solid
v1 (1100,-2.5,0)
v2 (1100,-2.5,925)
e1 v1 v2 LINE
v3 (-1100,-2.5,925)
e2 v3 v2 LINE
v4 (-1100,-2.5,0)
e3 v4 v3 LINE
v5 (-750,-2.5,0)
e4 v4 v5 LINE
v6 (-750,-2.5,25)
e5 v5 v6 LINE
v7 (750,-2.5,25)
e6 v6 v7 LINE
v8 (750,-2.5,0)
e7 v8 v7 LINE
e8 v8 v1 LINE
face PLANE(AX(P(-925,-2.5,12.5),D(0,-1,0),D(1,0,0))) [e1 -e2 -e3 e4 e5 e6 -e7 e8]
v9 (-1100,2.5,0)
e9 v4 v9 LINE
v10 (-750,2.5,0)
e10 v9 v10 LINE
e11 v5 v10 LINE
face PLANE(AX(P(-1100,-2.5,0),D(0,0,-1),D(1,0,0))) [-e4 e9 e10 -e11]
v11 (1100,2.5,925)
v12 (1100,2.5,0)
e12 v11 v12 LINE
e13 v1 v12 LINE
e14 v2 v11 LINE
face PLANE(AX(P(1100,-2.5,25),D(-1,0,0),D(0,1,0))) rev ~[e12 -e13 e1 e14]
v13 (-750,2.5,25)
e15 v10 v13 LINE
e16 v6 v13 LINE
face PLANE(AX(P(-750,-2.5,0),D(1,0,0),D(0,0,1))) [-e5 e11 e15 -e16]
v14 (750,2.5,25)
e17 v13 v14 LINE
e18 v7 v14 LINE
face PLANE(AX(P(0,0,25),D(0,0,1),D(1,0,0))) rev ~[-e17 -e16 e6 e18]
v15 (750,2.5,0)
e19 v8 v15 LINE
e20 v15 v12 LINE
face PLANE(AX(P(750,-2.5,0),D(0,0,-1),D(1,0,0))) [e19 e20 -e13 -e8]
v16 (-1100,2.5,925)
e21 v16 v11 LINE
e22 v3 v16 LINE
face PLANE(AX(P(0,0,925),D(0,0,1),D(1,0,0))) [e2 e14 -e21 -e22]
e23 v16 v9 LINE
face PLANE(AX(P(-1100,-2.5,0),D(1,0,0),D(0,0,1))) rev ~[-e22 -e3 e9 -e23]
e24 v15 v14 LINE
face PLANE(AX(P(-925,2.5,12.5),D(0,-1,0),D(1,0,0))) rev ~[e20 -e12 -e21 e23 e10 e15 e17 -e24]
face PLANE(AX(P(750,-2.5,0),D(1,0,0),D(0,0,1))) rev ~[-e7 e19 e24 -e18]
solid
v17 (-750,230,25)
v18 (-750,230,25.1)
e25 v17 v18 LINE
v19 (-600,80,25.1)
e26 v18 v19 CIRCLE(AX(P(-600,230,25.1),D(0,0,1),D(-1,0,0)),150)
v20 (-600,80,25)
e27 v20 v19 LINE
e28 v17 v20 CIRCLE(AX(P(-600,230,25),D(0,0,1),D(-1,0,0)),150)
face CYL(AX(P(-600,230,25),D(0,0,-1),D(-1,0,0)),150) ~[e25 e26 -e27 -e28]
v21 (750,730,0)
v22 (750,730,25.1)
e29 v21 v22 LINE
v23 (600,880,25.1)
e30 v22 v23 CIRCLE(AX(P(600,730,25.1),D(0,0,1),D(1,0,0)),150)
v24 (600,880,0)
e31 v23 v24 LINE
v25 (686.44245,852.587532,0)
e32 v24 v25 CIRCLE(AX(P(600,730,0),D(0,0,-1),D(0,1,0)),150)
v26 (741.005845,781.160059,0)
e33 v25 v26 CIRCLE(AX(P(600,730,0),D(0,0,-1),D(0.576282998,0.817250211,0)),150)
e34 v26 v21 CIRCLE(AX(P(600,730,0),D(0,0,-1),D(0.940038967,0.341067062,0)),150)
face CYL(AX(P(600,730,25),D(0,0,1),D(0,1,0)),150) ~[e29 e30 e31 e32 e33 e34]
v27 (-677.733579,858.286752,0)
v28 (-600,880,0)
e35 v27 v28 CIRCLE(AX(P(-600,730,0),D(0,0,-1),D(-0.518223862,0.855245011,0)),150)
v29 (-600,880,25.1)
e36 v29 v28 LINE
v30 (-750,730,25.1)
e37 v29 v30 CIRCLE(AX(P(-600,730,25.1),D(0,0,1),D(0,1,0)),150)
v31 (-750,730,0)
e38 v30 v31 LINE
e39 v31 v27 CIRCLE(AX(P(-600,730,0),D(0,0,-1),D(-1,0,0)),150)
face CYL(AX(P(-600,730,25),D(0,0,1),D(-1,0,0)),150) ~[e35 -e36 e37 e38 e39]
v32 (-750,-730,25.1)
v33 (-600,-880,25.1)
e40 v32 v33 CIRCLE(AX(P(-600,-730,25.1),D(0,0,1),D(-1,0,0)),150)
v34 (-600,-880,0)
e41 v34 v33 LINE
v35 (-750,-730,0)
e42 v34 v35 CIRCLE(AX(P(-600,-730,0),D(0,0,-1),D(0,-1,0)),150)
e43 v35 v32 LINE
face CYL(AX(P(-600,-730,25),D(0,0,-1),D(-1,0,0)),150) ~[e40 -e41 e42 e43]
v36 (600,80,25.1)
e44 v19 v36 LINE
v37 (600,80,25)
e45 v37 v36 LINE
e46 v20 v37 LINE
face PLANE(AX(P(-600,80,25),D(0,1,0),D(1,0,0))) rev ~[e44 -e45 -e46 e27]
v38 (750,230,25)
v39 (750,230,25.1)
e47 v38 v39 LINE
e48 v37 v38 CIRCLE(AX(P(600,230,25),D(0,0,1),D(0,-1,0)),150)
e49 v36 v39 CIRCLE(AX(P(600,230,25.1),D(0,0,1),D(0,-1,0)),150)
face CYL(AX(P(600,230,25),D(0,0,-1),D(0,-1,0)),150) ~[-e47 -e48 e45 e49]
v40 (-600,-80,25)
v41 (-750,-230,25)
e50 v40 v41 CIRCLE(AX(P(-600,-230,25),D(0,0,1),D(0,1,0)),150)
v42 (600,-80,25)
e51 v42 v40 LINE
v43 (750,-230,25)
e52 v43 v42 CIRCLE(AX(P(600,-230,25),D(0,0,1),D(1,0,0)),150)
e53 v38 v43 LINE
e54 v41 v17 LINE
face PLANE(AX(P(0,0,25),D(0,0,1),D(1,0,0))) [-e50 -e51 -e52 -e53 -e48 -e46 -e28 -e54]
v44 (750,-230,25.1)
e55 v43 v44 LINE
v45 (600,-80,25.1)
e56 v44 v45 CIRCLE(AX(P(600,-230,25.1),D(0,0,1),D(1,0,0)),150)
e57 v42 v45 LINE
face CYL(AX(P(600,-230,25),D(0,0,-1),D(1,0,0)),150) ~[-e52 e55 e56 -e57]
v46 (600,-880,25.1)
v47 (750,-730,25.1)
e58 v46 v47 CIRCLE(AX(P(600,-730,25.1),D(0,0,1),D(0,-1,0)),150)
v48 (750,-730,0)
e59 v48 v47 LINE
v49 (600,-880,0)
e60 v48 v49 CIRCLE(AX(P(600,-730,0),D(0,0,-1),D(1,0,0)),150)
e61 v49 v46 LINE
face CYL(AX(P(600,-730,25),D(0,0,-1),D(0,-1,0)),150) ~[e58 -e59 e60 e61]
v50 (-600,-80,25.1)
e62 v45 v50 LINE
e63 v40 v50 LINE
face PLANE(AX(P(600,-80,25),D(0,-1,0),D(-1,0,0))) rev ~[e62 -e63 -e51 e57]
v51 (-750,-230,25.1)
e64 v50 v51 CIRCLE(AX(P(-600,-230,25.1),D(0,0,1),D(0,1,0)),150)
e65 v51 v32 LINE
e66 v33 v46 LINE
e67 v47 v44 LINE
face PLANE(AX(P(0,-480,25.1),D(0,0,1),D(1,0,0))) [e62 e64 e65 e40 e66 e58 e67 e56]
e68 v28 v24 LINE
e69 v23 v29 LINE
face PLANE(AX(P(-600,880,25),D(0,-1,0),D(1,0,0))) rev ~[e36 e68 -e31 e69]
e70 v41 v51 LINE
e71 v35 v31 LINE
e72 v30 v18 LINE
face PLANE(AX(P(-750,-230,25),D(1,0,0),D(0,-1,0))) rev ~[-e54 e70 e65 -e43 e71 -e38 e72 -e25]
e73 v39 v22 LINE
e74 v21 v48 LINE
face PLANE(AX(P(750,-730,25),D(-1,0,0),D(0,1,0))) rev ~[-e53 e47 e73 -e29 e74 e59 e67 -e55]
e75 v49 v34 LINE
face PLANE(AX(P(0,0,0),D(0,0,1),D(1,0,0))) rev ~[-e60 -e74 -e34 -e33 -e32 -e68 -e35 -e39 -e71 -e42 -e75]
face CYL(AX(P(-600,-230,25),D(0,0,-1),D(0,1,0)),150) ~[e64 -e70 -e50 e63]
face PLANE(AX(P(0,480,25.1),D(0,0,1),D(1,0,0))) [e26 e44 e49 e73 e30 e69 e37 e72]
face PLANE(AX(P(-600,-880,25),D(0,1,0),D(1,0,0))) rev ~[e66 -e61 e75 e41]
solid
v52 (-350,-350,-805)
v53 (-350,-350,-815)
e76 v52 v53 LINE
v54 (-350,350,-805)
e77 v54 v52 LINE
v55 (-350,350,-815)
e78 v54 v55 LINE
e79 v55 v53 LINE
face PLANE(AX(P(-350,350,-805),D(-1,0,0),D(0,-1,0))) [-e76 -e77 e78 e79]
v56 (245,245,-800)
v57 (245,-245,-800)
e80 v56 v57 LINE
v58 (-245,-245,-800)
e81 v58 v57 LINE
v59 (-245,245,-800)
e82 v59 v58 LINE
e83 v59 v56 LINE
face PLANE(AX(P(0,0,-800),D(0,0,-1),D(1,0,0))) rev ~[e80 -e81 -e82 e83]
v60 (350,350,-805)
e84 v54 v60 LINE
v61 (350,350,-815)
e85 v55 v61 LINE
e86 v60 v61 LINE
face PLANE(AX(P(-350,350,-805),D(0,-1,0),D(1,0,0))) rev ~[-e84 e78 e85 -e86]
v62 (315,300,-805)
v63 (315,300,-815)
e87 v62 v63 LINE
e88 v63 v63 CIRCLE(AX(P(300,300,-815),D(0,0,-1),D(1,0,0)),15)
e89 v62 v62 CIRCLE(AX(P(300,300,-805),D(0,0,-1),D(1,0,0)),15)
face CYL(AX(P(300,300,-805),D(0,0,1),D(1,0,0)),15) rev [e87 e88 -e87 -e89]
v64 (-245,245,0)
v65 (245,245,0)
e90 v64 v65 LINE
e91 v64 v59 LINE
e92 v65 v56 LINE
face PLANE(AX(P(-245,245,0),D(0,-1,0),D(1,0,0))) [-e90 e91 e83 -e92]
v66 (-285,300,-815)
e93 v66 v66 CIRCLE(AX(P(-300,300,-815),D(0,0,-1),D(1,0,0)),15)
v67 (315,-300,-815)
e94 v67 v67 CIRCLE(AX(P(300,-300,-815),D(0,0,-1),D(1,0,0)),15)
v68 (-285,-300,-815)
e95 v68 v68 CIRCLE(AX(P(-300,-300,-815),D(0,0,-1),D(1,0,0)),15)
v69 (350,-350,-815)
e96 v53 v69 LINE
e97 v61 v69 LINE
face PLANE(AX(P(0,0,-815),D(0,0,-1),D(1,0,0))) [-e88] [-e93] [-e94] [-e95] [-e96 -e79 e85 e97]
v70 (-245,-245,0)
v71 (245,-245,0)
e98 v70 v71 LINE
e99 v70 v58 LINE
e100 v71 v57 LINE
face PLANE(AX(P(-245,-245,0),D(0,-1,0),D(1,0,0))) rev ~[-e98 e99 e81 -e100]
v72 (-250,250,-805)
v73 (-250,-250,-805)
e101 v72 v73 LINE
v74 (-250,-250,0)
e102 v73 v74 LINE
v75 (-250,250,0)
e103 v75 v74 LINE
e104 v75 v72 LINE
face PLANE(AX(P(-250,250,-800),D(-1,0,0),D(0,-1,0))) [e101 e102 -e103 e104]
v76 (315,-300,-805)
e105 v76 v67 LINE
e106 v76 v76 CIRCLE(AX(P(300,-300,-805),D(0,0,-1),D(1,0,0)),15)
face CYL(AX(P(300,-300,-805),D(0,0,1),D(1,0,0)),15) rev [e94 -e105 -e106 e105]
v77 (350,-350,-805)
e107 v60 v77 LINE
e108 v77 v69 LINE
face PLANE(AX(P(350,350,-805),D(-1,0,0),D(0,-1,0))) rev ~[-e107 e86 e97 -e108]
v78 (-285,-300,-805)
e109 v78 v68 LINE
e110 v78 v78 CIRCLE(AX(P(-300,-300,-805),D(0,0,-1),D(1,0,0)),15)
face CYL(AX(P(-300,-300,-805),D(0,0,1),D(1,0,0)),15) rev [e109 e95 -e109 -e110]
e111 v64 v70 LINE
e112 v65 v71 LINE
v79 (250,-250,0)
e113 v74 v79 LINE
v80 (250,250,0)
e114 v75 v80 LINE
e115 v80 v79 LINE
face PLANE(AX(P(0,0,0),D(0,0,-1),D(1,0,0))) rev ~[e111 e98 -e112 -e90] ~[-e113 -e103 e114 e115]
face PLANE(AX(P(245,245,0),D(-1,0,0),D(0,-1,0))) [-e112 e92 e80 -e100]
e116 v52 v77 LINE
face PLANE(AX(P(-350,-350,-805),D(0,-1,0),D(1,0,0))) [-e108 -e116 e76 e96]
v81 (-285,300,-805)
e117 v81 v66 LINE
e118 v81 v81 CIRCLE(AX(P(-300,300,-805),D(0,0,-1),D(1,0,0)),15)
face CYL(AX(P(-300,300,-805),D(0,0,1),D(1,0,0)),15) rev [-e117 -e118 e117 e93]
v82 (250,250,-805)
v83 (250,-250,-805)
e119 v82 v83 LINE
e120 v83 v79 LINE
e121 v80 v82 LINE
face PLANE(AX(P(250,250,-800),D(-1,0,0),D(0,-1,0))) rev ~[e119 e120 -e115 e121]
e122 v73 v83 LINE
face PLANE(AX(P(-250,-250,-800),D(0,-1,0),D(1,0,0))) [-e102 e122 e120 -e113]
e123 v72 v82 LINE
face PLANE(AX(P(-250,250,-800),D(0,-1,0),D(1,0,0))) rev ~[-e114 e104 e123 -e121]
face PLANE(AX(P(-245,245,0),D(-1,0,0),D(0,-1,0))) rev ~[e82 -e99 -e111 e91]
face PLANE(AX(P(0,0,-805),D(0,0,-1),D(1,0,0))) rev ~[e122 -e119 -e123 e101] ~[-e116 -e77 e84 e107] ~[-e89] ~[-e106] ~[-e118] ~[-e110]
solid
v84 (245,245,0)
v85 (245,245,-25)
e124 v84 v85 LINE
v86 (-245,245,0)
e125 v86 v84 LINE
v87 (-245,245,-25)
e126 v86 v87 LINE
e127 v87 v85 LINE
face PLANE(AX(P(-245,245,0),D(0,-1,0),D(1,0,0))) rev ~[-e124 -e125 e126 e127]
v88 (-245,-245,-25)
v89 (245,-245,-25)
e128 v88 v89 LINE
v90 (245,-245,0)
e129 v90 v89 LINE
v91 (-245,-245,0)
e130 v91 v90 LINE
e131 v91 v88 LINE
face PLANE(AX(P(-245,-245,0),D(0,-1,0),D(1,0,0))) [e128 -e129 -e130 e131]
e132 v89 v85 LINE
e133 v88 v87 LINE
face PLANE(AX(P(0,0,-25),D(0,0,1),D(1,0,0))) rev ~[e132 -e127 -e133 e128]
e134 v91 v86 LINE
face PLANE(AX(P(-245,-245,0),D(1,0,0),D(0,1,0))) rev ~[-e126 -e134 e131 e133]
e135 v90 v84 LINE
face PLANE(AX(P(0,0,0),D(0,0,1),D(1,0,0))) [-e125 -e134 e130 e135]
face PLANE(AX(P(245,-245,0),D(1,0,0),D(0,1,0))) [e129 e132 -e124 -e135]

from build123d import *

# Parameters (mm, degrees)
F0_R      = 1250
F1_DEPTH  = 25
F3_DEPTH  = 0.1
F4_W      = 500
F4_H      = 500
F4_W_2    = 490
F4_H_2    = 490
F5_DEPTH  = 800
F6_W      = 2200
F6_H      = 5
F7_DEPTH  = 900
F8_W      = 500
F8_H      = 500
F9_DEPTH  = 5
F10_W     = 700
F10_H     = 700
F10_R     = 15
F11_DEPTH = 10
F13_DEPTH = 30
F15_DEPTH = 30
F16_W     = 490
F16_H     = 490
F17_DEPTH = 25
F18_R     = 350
F20_DEPTH = 25
F21_W     = 350
F21_H     = 25
F22_DEPTH = 5


# Not quite as in the source:
# - a feature names something its author has since deleted; it is built from what else it names


with BuildPart() as f1:
    # F0 (on Top) → F1 (new body)
    with BuildSketch(Plane.XY):
        Circle(F0_R)
    extrude(amount=F1_DEPTH)

    # F2 (on face) → F3 (join)
    with BuildSketch(Plane.XY.offset(25)):
        with BuildLine():
            Line((-600, 80), (600, 80))
            ThreePointArc((600, 80), (706.066017178, 123.933982822), (750, 230))
            Line((750, 230), (750, 730))
            ThreePointArc((750, 730), (706.066017178, 836.066017178), (600, 880))
            Line((600, 880), (-600, 880))
            ThreePointArc((-600, 880), (-706.066017178, 836.066017178), (-750, 730))
            Line((-750, 730), (-750, 230))
            ThreePointArc((-750, 230), (-706.066017178, 123.933982822), (-600, 80))
        make_face()
        with BuildLine():
            ThreePointArc((-600, -80), (-706.066017178, -123.933982822), (-750, -230))
            Line((-750, -230), (-750, -730))
            ThreePointArc((-750, -730), (-706.066017178, -836.066017178), (-600, -880))
            Line((-600, -880), (600, -880))
            ThreePointArc((600, -880), (706.066017178, -836.066017178), (750, -730))
            Line((750, -730), (750, -230))
            ThreePointArc((750, -230), (706.066017178, -123.933982822), (600, -80))
            Line((600, -80), (-600, -80))
        make_face()
    extrude(amount=F3_DEPTH)

    # F12 (on face) → F13 (cut)
    with BuildSketch(Plane.XY.offset(25)):
        with BuildLine():
            ThreePointArc((835.2245207129, -930), (0, -1250), (-835.2245207129, -930))
            Line((-835.2245207129, -930), (-1254.9974999975, -930))
            Line((-1254.9974999975, -930), (-1254.9974999975, -1430))
            Line((-1254.9974999975, -1430), (1245.0025000025, -1430))
            Line((1245.0025000025, -1430), (1245.0025000025, -930))
            Line((1245.0025000025, -930), (835.2245207129, -930))
        make_face()
        with BuildLine():
            Line((-835.2245207129, 930), (835.2245207129, 930))
            ThreePointArc((835.2245207129, 930), (0, 1250), (-835.2245207129, 930))
        make_face()
        with BuildLine():
            Line((835.2245207129, -930), (-835.2245207129, -930))
            ThreePointArc((-835.2245207129, -930), (0, -1250), (835.2245207129, -930))
        make_face()
    extrude(amount=-F13_DEPTH, mode=Mode.SUBTRACT)

    # F14 (on face) → F15 (cut)
    with BuildSketch(Plane.XY.offset(25)):
        Polygon((835.2245207128, 930), (835.2245207128, -930), (1324.2889336484, -826), (1324.2889336484, 930), align=None)
        Polygon((-1324.2889336484, -826), (-835.2245207128, -930), (-835.2245207128, 930), (-1324.2889336484, 930), align=None)
    extrude(amount=-F15_DEPTH, mode=Mode.SUBTRACT)

    # F18
    f18_edges = [f1.edges().sort_by_distance(p)[0] for p in [
        (-835.224521, 930, 12.5),
        (-835.224521, -930, 12.5),
        (835.224521, -930, 12.5),
        (835.224521, 930, 12.5),
    ]]
    fillet(f18_edges, radius=F18_R)

    # F19 (on face) → F20 (cut)
    with BuildSketch(Plane.XY.offset(25)):
        with BuildLine():
            Line((-750, 230), (-750, 730))
            ThreePointArc((-750, 730), (-730.6905446057, 803.6205239771), (-677.7335793245, 858.2867516363))
            Line((-677.7335793245, 858.2867516363), (-665.502084486, 880))
            ThreePointArc((-665.502084486, 880), (-789.8531038437, 752.3410175776), (-835.2245207128, 580))
            Line((-835.2245207128, 580), (-835.2245207128, -580))
            ThreePointArc((-835.2245207128, -580), (-813.2271256953, -702.1240808553), (-750, -808.8972380092))
            Line((-750, -808.8972380092), (-750, -730))
            Line((-750, -730), (-750, -230))
            Line((-750, -230), (-750, 230))
        make_face()
        with BuildLine():
            Line((-665.502084486, 880), (-677.7335793245, 858.2867516363))
            ThreePointArc((-677.7335793245, 858.2867516363), (-640.3545985889, 874.4697420664), (-600, 880))
            Line((-600, 880), (-665.502084486, 880))
        make_face()
        with BuildLine():
            ThreePointArc((-485.2245207128, 930), (-578.7659553822, 917.2684390808), (-665.502084486, 880))
            Line((-665.502084486, 880), (-600, 880))
            Line((-600, 880), (600, 880))
            Line((600, 880), (665.502084486, 880))
            ThreePointArc((665.502084486, 880), (578.7659553822, 917.2684390808), (485.2245207128, 930))
            Line((485.2245207128, 930), (-485.2245207128, 930))
        make_face()
        with BuildLine():
            ThreePointArc((-600, -880), (-706.066017178, -836.066017178), (-750, -730))
            Line((-750, -730), (-750, -808.8972380092))
            ThreePointArc((-750, -808.8972380092), (-710.5730362948, -847.8022526511), (-665.5020844861, -880))
            Line((-665.5020844861, -880), (-600, -880))
        make_face()
        with BuildLine():
            Line((665.502084486, 880), (600, 880))
            ThreePointArc((600, 880), (645.3424208849, 872.9827432535), (686.4424496518, 852.5875315772))
            Line((686.4424496518, 852.5875315772), (665.502084486, 880))
        make_face()
        with BuildLine():
            Line((600, -880), (-600, -880))
            Line((-600, -880), (-665.5020844861, -880))
            ThreePointArc((-665.5020844861, -880), (-578.7659553822, -917.2684390808), (-485.2245207128, -930))
            Line((-485.2245207128, -930), (485.2245207128, -930))
            ThreePointArc((485.2245207128, -930), (578.7659553822, -917.2684390808), (665.5020844861, -880))
            Line((665.5020844861, -880), (600, -880))
        make_face()
        with BuildLine():
            Line((750, 730), (750, 230))
            Line((750, 230), (750, -230))
            Line((750, -230), (750, -730))
            Line((750, -730), (750, -808.8972380092))
            ThreePointArc((750, -808.8972380092), (813.2271256953, -702.1240808553), (835.2245207128, -580))
            Line((835.2245207128, -580), (835.2245207128, 580))
            ThreePointArc((835.2245207128, 580), (789.8531038437, 752.3410175776), (665.502084486, 880))
            Line((665.502084486, 880), (686.4424496518, 852.5875315772))
            ThreePointArc((686.4424496518, 852.5875315772), (719.2000530228, 821.0568358739), (741.0058450449, 781.1600592569))
            Line((741.0058450449, 781.1600592569), (750, 769.3860530853))
            Line((750, 769.3860530853), (750, 730))
        make_face()
        with BuildLine():
            ThreePointArc((750, -730), (706.066017178, -836.066017178), (600, -880))
            Line((600, -880), (665.5020844861, -880))
            ThreePointArc((665.5020844861, -880), (710.5730362948, -847.8022526511), (750, -808.8972380092))
            Line((750, -808.8972380092), (750, -730))
        make_face()
        with BuildLine():
            ThreePointArc((741.0058450449, 781.1600592569), (747.7343507055, 755.9723241476), (750, 730))
            Line((750, 730), (750, 769.3860530853))
            Line((750, 769.3860530853), (741.0058450449, 781.1600592569))
        make_face()
    extrude(amount=-F20_DEPTH, mode=Mode.SUBTRACT)


with BuildPart() as f5:
    # F4 (on face) → F5 (new body)
    with BuildSketch(Plane(origin=(0, 0, 0), x_dir=(1, 0, 0), z_dir=(0, 0, -1))):
        Rectangle(F4_W, F4_H)
        Rectangle(F4_W_2, F4_H_2, mode=Mode.SUBTRACT)
    extrude(amount=F5_DEPTH)

    # F8 (on face) → F9 (join)
    with BuildSketch(Plane(origin=(0, 0, -800), x_dir=(1, 0, 0), z_dir=(0, 0, -1))):
        Rectangle(F8_W, F8_H)
    extrude(amount=F9_DEPTH)

    # F10 (on face) → F11 (join)
    with BuildSketch(Plane(origin=(0, 0, -805), x_dir=(1, 0, 0), z_dir=(0, 0, -1))):
        Rectangle(F10_W, F10_H)
        with Locations((-300, -300)):
            Circle(F10_R, mode=Mode.SUBTRACT)
        with Locations((300, -300)):
            Circle(F10_R, mode=Mode.SUBTRACT)
        with Locations((-300, 300)):
            Circle(F10_R, mode=Mode.SUBTRACT)
        with Locations((300, 300)):
            Circle(F10_R, mode=Mode.SUBTRACT)
    extrude(amount=F11_DEPTH)


with BuildPart() as f7:
    # F6 (on face) → F7 (new body)
    with BuildSketch(Plane.XY.offset(25)):
        Rectangle(F6_W, F6_H)
    extrude(amount=F7_DEPTH)

    # F21 (on face) → F22 (join)
    with BuildSketch(Plane.XZ.offset(2.5)):
        with Locations((-925, 12.5)):
            Rectangle(F21_W, F21_H)
        with Locations((925, 12.5)):
            Rectangle(F21_W, F21_H)
    extrude(amount=-F22_DEPTH)


with BuildPart() as f17:
    # F16 (on face) → F17 (new body)
    with BuildSketch(Plane.XY):
        Rectangle(F16_W, F16_H)
    extrude(amount=-F17_DEPTH)


solid = Compound([f1.part, f5.part, f7.part, f17.part])
